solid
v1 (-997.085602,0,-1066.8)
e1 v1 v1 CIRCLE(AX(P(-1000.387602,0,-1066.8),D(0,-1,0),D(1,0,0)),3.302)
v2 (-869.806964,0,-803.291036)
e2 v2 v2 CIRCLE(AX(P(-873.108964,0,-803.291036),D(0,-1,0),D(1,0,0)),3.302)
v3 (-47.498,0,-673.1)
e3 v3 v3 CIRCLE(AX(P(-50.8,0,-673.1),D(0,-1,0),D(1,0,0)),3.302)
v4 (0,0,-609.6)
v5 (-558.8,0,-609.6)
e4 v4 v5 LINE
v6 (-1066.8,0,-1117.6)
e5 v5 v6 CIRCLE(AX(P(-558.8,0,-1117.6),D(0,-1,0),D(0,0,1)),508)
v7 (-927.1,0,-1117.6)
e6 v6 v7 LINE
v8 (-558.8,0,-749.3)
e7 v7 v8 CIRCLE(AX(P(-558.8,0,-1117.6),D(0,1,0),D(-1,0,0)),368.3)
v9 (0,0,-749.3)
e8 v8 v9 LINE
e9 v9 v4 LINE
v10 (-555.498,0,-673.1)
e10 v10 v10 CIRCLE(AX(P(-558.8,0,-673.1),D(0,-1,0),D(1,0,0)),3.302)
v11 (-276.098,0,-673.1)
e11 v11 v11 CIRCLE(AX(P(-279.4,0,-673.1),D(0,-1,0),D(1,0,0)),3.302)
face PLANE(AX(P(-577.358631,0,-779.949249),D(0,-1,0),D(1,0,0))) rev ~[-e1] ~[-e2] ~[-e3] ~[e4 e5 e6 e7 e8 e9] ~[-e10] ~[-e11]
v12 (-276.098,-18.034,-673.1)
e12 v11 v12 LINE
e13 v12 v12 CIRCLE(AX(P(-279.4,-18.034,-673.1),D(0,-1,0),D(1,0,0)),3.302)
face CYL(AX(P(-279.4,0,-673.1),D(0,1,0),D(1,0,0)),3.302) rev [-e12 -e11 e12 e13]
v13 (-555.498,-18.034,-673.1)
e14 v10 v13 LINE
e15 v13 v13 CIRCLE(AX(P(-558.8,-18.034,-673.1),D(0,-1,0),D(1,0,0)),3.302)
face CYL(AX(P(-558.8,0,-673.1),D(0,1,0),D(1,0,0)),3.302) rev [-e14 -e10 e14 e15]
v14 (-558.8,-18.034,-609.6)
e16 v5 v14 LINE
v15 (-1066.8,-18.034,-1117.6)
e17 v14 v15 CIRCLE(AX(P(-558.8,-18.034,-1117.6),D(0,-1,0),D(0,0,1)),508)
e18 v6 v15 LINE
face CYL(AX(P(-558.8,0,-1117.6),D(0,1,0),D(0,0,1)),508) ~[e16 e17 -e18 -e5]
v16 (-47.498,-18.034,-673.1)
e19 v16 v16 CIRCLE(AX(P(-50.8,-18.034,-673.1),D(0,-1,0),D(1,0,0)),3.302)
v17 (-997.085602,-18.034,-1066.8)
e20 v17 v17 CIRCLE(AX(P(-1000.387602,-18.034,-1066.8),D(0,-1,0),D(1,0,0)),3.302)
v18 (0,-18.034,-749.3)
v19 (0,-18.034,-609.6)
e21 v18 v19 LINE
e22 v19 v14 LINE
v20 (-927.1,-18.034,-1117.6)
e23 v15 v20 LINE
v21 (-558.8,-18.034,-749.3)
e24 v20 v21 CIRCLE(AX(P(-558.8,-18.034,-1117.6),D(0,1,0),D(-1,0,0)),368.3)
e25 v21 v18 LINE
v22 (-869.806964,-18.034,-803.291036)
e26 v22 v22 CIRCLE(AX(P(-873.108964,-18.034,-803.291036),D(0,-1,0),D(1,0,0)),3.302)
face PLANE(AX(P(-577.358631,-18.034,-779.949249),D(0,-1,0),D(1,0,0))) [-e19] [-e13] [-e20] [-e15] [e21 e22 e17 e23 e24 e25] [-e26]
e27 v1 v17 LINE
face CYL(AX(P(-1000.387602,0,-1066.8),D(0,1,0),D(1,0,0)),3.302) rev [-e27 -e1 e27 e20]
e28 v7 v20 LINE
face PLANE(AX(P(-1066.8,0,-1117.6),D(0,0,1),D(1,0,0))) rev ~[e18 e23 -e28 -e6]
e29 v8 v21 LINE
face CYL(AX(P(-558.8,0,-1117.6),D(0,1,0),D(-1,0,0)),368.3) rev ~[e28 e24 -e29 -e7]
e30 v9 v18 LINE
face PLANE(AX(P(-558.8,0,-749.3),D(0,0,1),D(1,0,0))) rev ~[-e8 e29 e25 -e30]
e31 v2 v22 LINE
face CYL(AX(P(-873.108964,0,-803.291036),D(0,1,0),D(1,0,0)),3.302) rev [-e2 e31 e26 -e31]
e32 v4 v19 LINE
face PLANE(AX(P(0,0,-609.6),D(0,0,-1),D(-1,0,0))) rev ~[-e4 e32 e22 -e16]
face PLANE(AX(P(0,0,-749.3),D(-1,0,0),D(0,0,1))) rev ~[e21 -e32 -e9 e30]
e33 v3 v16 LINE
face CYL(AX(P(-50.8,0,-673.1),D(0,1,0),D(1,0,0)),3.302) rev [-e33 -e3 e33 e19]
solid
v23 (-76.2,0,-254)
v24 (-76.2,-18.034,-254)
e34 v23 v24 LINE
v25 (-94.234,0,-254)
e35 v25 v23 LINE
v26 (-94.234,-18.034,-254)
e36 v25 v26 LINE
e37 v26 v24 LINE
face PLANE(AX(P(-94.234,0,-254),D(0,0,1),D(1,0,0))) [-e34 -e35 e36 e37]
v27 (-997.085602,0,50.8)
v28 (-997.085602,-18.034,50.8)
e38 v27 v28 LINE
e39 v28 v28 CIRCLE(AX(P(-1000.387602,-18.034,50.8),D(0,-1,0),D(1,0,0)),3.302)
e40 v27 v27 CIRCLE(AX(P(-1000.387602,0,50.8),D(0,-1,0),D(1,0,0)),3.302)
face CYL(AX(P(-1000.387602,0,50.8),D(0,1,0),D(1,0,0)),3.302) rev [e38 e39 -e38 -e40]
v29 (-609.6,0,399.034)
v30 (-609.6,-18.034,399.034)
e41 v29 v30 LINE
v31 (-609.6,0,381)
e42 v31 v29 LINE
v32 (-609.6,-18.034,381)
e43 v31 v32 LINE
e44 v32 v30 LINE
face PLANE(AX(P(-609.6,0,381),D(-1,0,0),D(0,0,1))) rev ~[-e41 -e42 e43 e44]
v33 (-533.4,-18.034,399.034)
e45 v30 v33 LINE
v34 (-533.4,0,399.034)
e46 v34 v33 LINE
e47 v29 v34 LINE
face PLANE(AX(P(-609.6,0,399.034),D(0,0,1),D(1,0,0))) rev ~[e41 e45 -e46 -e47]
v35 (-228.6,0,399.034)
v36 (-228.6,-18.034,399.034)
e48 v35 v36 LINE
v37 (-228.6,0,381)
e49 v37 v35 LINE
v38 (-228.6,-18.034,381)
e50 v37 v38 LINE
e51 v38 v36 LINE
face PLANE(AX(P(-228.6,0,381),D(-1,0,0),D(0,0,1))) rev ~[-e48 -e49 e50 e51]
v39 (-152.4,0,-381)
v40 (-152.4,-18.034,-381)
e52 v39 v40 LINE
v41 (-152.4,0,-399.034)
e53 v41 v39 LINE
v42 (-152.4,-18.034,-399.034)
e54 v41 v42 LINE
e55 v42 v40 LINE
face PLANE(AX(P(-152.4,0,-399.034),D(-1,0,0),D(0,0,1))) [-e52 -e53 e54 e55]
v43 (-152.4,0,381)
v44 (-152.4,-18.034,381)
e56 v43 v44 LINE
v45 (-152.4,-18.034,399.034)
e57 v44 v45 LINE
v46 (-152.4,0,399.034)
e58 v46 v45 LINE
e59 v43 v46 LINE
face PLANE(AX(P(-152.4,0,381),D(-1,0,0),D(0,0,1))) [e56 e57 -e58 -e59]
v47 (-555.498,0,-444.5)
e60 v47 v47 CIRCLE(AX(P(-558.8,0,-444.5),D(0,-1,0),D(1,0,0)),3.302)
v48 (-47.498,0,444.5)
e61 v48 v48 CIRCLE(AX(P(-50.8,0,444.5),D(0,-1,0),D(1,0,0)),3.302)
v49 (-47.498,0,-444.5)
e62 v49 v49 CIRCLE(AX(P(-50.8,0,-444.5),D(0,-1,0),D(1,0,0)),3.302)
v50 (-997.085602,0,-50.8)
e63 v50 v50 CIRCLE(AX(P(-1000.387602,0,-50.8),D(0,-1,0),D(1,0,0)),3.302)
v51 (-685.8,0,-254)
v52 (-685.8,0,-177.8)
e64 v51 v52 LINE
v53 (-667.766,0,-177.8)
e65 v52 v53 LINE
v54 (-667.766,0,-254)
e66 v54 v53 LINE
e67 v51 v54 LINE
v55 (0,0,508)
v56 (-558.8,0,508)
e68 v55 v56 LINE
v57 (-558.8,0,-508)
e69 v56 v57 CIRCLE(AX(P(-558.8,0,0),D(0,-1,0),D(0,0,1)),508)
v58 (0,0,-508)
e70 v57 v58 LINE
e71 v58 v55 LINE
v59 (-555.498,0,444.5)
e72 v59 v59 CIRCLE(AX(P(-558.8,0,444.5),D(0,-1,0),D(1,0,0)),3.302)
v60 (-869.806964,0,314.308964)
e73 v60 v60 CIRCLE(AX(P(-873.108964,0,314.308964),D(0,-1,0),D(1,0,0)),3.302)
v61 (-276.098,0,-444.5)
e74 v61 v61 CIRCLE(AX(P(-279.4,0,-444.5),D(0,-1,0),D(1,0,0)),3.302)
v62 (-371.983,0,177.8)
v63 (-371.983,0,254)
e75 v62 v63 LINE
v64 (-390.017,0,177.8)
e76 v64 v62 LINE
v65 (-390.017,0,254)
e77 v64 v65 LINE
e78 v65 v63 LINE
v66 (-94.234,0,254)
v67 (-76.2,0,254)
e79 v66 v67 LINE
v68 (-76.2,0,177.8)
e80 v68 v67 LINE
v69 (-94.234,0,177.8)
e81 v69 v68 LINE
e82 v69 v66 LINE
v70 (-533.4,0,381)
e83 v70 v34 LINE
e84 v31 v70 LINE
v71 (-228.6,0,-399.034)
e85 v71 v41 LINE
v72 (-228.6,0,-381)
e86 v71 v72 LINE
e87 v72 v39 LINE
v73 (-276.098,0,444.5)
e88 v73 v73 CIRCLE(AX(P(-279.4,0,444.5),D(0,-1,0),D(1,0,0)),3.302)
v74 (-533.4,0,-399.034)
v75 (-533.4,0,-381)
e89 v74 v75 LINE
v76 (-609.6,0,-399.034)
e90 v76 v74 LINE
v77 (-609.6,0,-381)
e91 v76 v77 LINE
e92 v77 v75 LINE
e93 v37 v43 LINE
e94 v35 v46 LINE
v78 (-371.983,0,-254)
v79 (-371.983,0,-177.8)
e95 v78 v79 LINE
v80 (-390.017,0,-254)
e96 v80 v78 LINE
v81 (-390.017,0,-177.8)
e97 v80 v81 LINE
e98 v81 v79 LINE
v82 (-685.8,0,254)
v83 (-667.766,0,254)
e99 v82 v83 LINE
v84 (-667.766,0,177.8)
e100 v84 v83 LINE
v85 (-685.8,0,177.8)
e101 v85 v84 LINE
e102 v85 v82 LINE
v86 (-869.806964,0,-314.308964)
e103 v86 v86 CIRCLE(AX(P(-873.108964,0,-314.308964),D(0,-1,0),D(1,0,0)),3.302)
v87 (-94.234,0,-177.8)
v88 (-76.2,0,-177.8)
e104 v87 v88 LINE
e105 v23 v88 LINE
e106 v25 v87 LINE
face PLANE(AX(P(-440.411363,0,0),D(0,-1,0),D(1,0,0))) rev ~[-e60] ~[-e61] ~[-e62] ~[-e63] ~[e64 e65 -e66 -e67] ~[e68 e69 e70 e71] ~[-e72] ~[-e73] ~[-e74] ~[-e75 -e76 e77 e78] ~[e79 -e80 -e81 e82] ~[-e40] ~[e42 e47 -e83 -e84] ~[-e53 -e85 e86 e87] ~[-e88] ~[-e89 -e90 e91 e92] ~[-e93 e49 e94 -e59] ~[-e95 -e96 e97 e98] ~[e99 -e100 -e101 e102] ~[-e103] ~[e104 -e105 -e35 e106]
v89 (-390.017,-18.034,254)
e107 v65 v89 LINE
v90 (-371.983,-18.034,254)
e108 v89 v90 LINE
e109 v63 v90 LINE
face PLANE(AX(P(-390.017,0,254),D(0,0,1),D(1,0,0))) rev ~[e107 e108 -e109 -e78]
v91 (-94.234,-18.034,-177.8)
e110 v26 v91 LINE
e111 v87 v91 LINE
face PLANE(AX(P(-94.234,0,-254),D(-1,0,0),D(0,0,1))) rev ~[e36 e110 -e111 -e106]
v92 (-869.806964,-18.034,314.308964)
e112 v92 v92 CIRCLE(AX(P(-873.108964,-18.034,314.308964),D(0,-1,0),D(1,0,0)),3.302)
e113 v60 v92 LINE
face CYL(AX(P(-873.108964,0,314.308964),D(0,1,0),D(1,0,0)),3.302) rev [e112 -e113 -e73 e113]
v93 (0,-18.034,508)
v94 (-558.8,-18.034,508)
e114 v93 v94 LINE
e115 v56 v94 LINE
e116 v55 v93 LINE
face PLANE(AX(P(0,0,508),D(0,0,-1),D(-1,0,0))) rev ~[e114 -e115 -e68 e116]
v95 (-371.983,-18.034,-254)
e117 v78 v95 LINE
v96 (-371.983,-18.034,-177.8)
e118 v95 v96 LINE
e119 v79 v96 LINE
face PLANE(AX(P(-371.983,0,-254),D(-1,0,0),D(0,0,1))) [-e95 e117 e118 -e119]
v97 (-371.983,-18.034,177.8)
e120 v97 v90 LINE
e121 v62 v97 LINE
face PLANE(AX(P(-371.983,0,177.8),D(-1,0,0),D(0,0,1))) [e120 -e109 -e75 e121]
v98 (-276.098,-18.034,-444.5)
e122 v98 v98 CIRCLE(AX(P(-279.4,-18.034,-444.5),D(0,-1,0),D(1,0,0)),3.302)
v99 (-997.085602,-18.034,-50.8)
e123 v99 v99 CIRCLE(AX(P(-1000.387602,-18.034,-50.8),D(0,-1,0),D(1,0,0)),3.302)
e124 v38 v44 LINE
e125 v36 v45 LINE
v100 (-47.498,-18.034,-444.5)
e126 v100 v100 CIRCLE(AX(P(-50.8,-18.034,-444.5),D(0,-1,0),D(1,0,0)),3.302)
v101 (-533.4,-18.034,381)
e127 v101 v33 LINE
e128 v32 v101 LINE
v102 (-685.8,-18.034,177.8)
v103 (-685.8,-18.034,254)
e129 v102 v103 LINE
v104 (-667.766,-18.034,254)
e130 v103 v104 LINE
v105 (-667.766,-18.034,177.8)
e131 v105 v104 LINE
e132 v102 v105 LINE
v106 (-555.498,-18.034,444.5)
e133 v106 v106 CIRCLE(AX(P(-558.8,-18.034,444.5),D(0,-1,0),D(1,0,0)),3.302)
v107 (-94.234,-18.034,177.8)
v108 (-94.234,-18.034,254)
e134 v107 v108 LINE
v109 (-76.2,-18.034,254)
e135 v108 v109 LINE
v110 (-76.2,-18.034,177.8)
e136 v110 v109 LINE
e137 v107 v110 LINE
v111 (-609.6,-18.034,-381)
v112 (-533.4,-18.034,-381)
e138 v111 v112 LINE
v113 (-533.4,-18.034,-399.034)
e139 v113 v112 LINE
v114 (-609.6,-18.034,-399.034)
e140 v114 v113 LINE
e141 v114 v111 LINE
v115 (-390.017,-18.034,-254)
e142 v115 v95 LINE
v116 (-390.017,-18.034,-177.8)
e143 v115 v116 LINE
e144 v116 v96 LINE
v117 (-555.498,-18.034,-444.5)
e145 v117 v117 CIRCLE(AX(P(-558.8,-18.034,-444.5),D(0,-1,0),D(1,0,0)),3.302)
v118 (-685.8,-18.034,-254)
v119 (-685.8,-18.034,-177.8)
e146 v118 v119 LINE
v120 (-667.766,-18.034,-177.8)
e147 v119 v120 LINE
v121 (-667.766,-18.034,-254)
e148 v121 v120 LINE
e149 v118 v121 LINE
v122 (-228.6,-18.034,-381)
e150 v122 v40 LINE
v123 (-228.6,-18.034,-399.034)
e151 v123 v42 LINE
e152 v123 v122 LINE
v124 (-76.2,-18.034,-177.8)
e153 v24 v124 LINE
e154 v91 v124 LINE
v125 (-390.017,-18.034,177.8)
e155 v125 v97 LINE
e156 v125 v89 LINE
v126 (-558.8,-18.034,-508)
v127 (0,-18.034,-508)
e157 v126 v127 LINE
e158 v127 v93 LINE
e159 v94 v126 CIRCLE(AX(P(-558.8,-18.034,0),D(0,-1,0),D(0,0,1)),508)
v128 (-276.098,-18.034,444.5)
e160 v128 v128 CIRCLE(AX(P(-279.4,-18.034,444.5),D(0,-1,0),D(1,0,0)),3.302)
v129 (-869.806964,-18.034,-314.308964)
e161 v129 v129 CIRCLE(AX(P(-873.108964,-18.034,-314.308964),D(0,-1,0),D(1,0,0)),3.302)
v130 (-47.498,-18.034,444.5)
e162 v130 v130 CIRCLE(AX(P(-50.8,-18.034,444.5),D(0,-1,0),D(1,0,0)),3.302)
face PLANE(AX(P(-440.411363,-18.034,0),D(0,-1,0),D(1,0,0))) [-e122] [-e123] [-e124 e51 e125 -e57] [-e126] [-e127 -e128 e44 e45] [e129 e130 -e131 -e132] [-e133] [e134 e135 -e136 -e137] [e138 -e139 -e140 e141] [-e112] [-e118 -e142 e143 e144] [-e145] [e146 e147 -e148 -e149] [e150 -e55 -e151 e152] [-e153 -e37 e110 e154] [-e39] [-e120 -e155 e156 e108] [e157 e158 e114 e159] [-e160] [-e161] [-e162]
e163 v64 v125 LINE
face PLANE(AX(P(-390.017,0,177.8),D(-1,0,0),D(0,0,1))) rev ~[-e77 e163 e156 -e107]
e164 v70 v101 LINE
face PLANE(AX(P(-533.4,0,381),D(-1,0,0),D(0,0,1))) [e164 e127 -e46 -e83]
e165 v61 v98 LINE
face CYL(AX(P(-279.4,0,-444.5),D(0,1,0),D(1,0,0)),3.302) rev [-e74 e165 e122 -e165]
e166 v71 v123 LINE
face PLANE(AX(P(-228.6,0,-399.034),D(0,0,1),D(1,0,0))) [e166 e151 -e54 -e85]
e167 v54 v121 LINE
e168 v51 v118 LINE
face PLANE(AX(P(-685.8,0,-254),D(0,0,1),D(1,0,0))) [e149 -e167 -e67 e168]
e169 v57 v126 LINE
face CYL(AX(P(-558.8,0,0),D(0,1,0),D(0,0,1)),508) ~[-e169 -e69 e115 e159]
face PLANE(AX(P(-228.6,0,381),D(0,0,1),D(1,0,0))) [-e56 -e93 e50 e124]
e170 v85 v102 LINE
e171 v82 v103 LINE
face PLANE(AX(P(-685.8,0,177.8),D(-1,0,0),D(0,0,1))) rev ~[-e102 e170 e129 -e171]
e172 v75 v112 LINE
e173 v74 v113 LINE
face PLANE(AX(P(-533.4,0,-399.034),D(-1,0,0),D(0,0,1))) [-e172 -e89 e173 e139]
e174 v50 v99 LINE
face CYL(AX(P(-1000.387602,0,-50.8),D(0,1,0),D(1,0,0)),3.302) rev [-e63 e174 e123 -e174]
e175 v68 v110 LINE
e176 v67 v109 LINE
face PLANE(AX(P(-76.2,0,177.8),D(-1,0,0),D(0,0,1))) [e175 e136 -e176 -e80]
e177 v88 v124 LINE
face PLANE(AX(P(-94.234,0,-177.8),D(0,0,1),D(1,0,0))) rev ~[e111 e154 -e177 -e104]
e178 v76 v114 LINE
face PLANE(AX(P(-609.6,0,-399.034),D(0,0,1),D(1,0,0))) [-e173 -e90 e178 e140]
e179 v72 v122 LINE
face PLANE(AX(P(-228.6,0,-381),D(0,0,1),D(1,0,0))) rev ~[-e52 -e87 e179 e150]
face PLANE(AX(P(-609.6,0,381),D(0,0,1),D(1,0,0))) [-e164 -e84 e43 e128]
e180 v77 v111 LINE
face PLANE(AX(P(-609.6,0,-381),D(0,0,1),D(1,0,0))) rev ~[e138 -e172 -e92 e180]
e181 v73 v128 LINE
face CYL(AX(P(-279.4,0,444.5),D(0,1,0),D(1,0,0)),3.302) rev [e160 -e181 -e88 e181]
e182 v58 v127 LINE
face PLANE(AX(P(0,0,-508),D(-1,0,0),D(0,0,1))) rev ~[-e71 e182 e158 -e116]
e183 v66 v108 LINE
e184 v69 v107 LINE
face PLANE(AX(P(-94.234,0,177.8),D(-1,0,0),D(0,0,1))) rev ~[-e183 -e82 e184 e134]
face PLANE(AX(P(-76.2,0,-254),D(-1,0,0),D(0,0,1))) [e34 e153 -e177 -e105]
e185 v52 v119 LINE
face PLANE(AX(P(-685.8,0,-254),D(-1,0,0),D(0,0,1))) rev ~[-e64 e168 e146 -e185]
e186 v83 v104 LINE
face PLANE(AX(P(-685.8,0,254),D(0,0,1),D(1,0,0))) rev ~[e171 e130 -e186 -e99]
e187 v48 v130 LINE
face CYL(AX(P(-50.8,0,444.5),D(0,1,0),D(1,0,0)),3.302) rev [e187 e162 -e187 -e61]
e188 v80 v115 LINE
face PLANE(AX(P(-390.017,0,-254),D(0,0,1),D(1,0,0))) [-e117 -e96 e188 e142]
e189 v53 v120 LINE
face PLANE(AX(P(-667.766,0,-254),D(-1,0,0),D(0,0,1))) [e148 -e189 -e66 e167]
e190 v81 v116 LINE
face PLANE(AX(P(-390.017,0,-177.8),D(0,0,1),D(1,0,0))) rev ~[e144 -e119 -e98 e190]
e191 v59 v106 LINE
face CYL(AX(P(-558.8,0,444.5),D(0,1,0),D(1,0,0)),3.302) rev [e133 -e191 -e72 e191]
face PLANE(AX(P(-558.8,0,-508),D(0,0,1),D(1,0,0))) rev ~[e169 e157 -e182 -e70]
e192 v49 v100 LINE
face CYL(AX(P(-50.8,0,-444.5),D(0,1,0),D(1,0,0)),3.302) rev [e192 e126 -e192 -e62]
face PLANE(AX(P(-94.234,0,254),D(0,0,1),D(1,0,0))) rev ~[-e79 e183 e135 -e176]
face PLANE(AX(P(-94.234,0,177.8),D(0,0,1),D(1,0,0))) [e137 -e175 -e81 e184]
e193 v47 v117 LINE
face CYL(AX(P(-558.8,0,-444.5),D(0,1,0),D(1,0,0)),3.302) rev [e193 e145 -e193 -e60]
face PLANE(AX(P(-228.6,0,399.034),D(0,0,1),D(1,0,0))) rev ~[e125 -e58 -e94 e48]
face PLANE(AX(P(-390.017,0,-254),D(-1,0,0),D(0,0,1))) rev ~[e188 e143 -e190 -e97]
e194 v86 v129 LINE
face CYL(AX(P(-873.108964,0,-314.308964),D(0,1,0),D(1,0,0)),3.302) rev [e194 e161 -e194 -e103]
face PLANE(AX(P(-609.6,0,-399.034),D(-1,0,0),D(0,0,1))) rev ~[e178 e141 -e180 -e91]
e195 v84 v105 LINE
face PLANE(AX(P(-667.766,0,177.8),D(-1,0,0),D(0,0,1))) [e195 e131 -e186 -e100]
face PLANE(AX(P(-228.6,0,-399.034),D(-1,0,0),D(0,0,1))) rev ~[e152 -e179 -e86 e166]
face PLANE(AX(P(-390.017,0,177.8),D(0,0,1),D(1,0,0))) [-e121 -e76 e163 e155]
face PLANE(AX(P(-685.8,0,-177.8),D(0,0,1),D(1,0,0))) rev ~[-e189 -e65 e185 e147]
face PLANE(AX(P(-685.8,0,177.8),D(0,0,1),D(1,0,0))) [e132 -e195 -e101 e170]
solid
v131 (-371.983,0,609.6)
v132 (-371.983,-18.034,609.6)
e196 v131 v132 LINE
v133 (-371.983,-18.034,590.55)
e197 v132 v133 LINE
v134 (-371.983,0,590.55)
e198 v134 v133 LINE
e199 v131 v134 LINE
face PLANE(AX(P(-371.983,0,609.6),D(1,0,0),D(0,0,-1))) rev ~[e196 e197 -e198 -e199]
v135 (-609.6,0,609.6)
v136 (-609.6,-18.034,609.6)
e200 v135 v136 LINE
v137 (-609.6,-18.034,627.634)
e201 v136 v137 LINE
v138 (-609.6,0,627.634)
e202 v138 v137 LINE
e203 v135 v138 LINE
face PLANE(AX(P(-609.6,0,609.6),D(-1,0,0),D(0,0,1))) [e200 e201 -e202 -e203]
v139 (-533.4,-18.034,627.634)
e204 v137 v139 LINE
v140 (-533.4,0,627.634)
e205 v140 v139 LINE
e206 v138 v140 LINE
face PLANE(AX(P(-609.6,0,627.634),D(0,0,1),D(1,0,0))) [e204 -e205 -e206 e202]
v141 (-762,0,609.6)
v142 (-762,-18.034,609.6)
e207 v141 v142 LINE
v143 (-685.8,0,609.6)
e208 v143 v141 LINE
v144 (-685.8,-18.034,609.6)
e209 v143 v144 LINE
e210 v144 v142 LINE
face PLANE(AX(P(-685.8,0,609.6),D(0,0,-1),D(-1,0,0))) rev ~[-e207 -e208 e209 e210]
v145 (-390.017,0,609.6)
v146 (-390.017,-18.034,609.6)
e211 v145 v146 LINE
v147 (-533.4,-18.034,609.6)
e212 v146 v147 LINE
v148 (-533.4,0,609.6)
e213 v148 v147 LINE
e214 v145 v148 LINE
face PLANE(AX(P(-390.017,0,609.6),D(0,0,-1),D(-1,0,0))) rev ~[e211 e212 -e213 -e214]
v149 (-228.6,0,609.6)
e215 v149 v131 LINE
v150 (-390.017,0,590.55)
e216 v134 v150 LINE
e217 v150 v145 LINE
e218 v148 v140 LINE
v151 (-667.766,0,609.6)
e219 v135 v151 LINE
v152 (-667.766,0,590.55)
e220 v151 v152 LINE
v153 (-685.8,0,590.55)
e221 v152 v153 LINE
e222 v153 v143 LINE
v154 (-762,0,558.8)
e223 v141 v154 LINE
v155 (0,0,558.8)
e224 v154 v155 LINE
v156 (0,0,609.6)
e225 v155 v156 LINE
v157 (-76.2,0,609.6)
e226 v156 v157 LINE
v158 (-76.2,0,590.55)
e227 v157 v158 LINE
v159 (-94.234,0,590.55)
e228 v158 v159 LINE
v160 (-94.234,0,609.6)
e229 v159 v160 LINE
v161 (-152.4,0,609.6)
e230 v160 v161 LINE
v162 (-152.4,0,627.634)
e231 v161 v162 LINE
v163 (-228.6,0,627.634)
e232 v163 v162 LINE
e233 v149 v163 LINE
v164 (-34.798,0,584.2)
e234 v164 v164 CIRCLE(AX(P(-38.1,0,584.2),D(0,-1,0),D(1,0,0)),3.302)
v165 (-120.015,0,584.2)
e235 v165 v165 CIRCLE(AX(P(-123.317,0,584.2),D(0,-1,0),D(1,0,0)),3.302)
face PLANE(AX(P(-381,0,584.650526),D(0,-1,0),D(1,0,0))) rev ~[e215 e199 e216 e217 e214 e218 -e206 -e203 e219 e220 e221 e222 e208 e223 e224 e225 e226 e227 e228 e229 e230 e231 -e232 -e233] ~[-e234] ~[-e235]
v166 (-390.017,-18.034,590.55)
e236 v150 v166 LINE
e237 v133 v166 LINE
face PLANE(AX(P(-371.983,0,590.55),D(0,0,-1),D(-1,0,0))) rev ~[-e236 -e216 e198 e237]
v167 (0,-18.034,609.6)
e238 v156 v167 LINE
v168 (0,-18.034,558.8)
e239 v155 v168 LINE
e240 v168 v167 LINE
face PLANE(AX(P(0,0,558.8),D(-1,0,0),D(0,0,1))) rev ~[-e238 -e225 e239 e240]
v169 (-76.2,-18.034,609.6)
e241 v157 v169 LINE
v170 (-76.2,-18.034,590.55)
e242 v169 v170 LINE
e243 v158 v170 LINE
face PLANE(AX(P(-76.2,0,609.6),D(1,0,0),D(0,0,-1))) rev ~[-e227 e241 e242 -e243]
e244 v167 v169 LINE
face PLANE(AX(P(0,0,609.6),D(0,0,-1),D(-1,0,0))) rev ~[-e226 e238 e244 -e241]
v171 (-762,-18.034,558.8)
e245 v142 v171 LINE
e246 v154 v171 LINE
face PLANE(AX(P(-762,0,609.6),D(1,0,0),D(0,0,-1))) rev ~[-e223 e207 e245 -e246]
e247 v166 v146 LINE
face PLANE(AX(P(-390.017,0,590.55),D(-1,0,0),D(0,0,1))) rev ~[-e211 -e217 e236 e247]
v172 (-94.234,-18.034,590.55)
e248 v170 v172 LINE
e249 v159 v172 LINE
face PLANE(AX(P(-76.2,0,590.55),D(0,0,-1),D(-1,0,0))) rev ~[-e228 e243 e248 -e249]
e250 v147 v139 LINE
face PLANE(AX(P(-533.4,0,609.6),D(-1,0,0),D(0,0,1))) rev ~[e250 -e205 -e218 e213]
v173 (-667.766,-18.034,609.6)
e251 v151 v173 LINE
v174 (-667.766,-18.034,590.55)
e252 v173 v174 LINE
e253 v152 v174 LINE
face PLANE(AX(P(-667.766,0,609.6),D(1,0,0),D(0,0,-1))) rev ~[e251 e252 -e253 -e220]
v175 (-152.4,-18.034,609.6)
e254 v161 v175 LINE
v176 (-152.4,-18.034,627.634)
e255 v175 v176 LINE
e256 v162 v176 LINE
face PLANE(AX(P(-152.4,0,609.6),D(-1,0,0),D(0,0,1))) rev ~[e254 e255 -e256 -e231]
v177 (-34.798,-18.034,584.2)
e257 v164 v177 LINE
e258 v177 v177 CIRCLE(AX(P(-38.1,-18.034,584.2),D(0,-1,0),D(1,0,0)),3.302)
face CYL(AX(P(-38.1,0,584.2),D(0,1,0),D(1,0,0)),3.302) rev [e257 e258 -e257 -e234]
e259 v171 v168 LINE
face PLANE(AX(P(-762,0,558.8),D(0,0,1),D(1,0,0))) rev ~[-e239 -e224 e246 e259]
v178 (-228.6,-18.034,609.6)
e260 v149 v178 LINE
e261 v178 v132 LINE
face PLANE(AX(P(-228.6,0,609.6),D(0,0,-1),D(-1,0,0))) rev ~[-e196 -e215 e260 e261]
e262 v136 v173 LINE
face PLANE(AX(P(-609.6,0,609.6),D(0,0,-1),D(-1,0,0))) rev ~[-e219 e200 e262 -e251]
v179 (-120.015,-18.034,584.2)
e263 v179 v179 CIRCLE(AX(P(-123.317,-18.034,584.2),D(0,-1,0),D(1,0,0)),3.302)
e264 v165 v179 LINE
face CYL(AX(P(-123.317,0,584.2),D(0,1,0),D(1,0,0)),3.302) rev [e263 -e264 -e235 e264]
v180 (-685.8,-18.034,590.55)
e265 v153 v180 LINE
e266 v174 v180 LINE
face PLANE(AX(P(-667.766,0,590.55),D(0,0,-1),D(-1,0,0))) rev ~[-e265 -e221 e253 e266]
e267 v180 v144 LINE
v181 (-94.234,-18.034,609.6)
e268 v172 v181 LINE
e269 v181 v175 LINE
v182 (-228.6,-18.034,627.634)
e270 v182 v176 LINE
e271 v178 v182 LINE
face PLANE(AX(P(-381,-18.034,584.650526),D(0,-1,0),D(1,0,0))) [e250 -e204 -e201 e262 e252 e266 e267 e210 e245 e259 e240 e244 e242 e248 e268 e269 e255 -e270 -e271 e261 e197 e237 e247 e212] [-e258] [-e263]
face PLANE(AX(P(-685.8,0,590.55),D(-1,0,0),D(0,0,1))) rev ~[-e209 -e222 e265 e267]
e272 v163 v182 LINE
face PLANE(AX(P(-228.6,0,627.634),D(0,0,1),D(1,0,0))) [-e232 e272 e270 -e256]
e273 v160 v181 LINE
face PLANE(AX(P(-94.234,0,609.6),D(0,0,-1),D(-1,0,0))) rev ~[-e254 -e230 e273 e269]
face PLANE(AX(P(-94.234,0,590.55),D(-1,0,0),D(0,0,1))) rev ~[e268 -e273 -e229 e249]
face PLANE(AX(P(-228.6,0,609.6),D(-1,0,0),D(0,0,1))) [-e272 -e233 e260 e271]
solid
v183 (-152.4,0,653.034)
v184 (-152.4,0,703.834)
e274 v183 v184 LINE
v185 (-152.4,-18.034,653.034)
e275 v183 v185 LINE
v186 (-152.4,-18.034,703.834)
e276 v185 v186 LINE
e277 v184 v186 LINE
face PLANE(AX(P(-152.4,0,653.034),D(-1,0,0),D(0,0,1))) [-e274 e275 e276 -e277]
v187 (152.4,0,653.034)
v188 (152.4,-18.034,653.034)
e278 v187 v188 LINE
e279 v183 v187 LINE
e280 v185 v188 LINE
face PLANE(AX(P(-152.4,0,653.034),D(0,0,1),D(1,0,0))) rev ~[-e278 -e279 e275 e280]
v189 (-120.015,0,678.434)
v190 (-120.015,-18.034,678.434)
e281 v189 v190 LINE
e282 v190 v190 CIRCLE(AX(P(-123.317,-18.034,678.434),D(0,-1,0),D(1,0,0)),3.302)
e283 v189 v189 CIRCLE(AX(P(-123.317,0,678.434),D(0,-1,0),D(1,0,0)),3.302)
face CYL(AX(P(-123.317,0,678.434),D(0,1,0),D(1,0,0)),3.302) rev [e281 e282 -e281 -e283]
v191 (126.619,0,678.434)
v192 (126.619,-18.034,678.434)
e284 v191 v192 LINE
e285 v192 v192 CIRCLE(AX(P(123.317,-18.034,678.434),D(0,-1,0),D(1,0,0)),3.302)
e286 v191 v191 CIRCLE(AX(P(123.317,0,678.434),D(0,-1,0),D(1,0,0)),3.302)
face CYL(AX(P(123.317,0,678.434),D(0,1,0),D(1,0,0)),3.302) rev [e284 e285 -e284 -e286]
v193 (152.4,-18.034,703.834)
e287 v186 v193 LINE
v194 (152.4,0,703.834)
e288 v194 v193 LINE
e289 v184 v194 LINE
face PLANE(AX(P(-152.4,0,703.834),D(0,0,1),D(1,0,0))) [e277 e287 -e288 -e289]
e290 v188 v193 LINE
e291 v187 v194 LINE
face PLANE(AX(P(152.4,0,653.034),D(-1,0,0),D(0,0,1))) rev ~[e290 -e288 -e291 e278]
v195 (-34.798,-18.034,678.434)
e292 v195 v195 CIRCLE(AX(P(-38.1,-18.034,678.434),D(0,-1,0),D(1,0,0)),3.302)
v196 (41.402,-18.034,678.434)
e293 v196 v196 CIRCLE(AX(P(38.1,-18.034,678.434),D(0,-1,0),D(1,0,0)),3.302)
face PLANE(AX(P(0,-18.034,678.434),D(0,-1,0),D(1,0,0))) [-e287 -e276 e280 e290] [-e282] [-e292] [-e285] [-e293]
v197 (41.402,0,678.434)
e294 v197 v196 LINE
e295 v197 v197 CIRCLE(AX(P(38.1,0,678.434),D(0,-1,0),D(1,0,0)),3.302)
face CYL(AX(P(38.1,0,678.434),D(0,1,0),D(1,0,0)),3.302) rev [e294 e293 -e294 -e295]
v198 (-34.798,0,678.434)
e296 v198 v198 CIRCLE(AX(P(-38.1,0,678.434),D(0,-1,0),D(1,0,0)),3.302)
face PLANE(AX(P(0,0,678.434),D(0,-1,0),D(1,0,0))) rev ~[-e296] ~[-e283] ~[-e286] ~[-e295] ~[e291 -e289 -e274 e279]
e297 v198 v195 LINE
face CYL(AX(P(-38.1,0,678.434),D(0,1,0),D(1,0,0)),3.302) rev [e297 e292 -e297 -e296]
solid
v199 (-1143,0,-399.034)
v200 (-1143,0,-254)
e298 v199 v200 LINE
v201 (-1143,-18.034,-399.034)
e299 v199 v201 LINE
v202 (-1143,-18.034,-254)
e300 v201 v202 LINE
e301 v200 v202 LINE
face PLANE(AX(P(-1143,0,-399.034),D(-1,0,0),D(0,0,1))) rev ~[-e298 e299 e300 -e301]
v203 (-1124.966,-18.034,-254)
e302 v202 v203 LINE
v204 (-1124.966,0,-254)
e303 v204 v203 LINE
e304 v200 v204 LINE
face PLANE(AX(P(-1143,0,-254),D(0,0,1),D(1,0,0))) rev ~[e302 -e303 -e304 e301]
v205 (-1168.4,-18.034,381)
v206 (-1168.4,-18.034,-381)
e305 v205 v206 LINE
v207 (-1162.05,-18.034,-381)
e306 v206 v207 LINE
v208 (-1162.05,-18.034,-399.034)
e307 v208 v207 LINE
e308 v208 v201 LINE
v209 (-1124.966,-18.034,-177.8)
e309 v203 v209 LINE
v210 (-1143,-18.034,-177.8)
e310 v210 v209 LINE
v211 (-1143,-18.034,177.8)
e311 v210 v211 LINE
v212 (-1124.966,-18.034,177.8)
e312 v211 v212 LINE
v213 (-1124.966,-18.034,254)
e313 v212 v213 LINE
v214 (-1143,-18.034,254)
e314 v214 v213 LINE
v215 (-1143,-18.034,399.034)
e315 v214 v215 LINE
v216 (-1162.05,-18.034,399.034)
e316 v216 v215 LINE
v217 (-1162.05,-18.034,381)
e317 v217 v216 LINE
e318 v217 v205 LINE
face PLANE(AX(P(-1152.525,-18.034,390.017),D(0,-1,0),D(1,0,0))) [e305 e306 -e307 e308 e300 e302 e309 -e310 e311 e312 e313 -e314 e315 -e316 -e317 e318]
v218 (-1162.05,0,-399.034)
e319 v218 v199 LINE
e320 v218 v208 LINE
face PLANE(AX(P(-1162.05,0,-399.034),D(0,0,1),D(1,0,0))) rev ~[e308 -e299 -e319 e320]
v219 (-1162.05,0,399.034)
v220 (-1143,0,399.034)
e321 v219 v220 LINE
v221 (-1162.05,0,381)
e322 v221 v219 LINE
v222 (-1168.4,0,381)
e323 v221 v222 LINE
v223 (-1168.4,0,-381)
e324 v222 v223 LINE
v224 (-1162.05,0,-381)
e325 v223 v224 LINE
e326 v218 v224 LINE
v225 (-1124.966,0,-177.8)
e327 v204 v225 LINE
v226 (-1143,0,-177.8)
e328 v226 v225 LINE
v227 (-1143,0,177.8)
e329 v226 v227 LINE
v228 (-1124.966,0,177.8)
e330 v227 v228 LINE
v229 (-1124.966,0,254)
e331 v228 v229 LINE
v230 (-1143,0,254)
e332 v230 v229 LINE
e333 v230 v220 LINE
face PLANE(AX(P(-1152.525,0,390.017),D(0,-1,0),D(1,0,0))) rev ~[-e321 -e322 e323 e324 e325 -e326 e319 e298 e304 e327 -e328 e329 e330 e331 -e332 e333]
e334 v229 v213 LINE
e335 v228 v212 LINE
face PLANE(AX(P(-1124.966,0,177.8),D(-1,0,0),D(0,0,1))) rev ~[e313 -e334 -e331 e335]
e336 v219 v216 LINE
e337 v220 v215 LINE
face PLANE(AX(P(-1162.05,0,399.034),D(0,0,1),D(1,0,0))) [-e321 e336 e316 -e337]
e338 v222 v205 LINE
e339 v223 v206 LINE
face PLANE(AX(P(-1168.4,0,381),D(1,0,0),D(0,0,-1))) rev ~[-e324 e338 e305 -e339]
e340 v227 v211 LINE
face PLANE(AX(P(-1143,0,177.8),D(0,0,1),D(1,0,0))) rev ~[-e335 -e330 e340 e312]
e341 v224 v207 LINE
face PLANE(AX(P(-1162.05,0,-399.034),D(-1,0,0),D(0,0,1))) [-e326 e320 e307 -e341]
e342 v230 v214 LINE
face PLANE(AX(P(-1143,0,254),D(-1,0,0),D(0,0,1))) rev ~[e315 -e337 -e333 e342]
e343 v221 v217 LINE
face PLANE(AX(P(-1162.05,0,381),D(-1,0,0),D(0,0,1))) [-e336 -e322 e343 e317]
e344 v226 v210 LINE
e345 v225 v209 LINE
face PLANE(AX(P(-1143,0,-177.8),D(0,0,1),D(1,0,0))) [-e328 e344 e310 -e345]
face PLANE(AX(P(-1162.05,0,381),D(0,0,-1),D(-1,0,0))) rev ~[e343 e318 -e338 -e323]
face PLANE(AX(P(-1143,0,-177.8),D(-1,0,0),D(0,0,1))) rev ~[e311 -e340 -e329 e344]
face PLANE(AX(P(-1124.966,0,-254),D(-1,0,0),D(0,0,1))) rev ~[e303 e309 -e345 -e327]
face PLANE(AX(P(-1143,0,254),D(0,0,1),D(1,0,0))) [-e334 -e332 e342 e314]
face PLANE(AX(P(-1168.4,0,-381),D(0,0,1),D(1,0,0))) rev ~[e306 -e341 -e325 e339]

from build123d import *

# Parameters (mm, degrees)
F1_W     = 19.05
F1_H     = 18.034
F1_W_2   = 18.034
F1_H_2   = 76.2
F2_DEPTH = 18.034
F1_R     = 3.302
F1_W_3   = 76.2
F1_W_4   = 304.8
F1_H_3   = 50.8


# Not quite as in the source:
# - a variable given as a bare number and used for a length is read in inches; the dataset says mm whatever the document's units were


with BuildPart() as f2:
    # F1 (on Front) → F2 (new body)
    with BuildSketch(Plane.XZ):
        with Locations((-1152.525, 390.017)):
            Rectangle(F1_W, F1_H)
        Polygon((-1162.05, -381), (-1143, -381), (-1143, -254), (-1143, -177.8), (-1143, 177.8), (-1143, 254), (-1143, 381), (-1162.05, 381), (-1168.4, 381), (-1168.4, -381), align=None)
        with Locations((-1133.983, 215.9)):
            Rectangle(F1_W_2, F1_H_2)
        with Locations((-1152.525, -390.017)):
            Rectangle(F1_W, F1_H)
        with Locations((-1133.983, -215.9)):
            Rectangle(F1_W_2, F1_H_2)
    extrude(amount=F2_DEPTH)


with BuildPart() as f2b:
    # F1 (on Front) → F2, piece 2 (new body)
    with BuildSketch(Plane.XZ):
        with BuildLine():
            Line((0, -508), (0, 508))
            Line((0, 508), (-558.8, 508))
            ThreePointArc((-558.8, 508), (-1066.8, 0), (-558.8, -508))
            Line((-558.8, -508), (0, -508))
        make_face()
        with Locations((-873.1089642374, -314.3089642374)):
            Circle(F1_R, mode=Mode.SUBTRACT)
        with Locations((-558.8, -444.5)):
            Circle(F1_R, mode=Mode.SUBTRACT)
        with Locations((-676.783, -215.9)):
            Rectangle(F1_W_2, F1_H_2, mode=Mode.SUBTRACT)
        with Locations((-571.5, -390.017)):
            Rectangle(F1_W_3, F1_H, mode=Mode.SUBTRACT)
        with Locations((-279.4, -444.5)):
            Circle(F1_R, mode=Mode.SUBTRACT)
        with Locations((-381, -215.9)):
            Rectangle(F1_W_2, F1_H_2, mode=Mode.SUBTRACT)
        with Locations((-190.5, -390.017)):
            Rectangle(F1_W_3, F1_H, mode=Mode.SUBTRACT)
        with Locations((-50.8, -444.5)):
            Circle(F1_R, mode=Mode.SUBTRACT)
        with Locations((-85.217, -215.9)):
            Rectangle(F1_W_2, F1_H_2, mode=Mode.SUBTRACT)
        with Locations((-1000.3876017281, -50.8)):
            Circle(F1_R, mode=Mode.SUBTRACT)
        with Locations((-1000.3876017281, 50.8)):
            Circle(F1_R, mode=Mode.SUBTRACT)
        with Locations((-676.783, 215.9)):
            Rectangle(F1_W_2, F1_H_2, mode=Mode.SUBTRACT)
        with Locations((-873.1089642374, 314.3089642374)):
            Circle(F1_R, mode=Mode.SUBTRACT)
        with Locations((-571.5, 390.017)):
            Rectangle(F1_W_3, F1_H, mode=Mode.SUBTRACT)
        with Locations((-558.8, 444.5)):
            Circle(F1_R, mode=Mode.SUBTRACT)
        with Locations((-381, 215.9)):
            Rectangle(F1_W_2, F1_H_2, mode=Mode.SUBTRACT)
        with Locations((-85.217, 215.9)):
            Rectangle(F1_W_2, F1_H_2, mode=Mode.SUBTRACT)
        with Locations((-279.4, 444.5)):
            Circle(F1_R, mode=Mode.SUBTRACT)
        with Locations((-190.5, 390.017)):
            Rectangle(F1_W_3, F1_H, mode=Mode.SUBTRACT)
        with Locations((-50.8, 444.5)):
            Circle(F1_R, mode=Mode.SUBTRACT)
    extrude(amount=F2_DEPTH)


with BuildPart() as f2c:
    # F1 (on Front) → F2, piece 3 (new body)
    with BuildSketch(Plane.XZ):
        with BuildLine():
            Line((0, -749.3), (0, -609.6))
            Line((0, -609.6), (-558.8, -609.6))
            ThreePointArc((-558.8, -609.6), (-918.0102448428, -758.3897551572), (-1066.8, -1117.6))
            Line((-1066.8, -1117.6), (-927.1, -1117.6))
            ThreePointArc((-927.1, -1117.6), (-819.227427511, -857.172572489), (-558.8, -749.3))
            Line((-558.8, -749.3), (0, -749.3))
        make_face()
        with Locations((-1000.3876017281, -1066.8)):
            Circle(F1_R, mode=Mode.SUBTRACT)
        with Locations((-873.1089642374, -803.2910357626)):
            Circle(F1_R, mode=Mode.SUBTRACT)
        with Locations((-558.8, -673.1)):
            Circle(F1_R, mode=Mode.SUBTRACT)
        with Locations((-279.4, -673.1)):
            Circle(F1_R, mode=Mode.SUBTRACT)
        with Locations((-50.8, -673.1)):
            Circle(F1_R, mode=Mode.SUBTRACT)
    extrude(amount=F2_DEPTH)


with BuildPart() as f2d:
    # F1 (on Front) → F2, piece 4 (new body)
    with BuildSketch(Plane.XZ):
        Polygon((-762, 609.6), (-762, 558.8), (0, 558.8), (0, 609.6), (-76.2, 609.6), (-76.2, 590.55), (-94.234, 590.55), (-94.234, 609.6), (-152.4, 609.6), (-228.6, 609.6), (-371.983, 609.6), (-371.983, 590.55), (-390.017, 590.55), (-390.017, 609.6), (-533.4, 609.6), (-609.6, 609.6), (-667.766, 609.6), (-667.766, 590.55), (-685.8, 590.55), (-685.8, 609.6), align=None)
        with Locations((-123.317, 584.2)):
            Circle(F1_R, mode=Mode.SUBTRACT)
        with Locations((-38.1, 584.2)):
            Circle(F1_R, mode=Mode.SUBTRACT)
        with Locations((-571.5, 618.617)):
            Rectangle(F1_W_3, F1_H)
        with Locations((-190.5, 618.617)):
            Rectangle(F1_W_3, F1_H)
    extrude(amount=F2_DEPTH)


with BuildPart() as f2e:
    # F1 (on Front) → F2, piece 5 (new body)
    with BuildSketch(Plane.XZ):
        with Locations((0, 678.434)):
            Rectangle(F1_W_4, F1_H_3)
        with Locations((-123.317, 678.434)):
            Circle(F1_R, mode=Mode.SUBTRACT)
        with Locations((-38.1, 678.434)):
            Circle(F1_R, mode=Mode.SUBTRACT)
        with Locations((38.1, 678.434)):
            Circle(F1_R, mode=Mode.SUBTRACT)
        with Locations((123.317, 678.434)):
            Circle(F1_R, mode=Mode.SUBTRACT)
    extrude(amount=F2_DEPTH)


solid = Compound([f2.part, f2b.part, f2c.part, f2d.part, f2e.part])
